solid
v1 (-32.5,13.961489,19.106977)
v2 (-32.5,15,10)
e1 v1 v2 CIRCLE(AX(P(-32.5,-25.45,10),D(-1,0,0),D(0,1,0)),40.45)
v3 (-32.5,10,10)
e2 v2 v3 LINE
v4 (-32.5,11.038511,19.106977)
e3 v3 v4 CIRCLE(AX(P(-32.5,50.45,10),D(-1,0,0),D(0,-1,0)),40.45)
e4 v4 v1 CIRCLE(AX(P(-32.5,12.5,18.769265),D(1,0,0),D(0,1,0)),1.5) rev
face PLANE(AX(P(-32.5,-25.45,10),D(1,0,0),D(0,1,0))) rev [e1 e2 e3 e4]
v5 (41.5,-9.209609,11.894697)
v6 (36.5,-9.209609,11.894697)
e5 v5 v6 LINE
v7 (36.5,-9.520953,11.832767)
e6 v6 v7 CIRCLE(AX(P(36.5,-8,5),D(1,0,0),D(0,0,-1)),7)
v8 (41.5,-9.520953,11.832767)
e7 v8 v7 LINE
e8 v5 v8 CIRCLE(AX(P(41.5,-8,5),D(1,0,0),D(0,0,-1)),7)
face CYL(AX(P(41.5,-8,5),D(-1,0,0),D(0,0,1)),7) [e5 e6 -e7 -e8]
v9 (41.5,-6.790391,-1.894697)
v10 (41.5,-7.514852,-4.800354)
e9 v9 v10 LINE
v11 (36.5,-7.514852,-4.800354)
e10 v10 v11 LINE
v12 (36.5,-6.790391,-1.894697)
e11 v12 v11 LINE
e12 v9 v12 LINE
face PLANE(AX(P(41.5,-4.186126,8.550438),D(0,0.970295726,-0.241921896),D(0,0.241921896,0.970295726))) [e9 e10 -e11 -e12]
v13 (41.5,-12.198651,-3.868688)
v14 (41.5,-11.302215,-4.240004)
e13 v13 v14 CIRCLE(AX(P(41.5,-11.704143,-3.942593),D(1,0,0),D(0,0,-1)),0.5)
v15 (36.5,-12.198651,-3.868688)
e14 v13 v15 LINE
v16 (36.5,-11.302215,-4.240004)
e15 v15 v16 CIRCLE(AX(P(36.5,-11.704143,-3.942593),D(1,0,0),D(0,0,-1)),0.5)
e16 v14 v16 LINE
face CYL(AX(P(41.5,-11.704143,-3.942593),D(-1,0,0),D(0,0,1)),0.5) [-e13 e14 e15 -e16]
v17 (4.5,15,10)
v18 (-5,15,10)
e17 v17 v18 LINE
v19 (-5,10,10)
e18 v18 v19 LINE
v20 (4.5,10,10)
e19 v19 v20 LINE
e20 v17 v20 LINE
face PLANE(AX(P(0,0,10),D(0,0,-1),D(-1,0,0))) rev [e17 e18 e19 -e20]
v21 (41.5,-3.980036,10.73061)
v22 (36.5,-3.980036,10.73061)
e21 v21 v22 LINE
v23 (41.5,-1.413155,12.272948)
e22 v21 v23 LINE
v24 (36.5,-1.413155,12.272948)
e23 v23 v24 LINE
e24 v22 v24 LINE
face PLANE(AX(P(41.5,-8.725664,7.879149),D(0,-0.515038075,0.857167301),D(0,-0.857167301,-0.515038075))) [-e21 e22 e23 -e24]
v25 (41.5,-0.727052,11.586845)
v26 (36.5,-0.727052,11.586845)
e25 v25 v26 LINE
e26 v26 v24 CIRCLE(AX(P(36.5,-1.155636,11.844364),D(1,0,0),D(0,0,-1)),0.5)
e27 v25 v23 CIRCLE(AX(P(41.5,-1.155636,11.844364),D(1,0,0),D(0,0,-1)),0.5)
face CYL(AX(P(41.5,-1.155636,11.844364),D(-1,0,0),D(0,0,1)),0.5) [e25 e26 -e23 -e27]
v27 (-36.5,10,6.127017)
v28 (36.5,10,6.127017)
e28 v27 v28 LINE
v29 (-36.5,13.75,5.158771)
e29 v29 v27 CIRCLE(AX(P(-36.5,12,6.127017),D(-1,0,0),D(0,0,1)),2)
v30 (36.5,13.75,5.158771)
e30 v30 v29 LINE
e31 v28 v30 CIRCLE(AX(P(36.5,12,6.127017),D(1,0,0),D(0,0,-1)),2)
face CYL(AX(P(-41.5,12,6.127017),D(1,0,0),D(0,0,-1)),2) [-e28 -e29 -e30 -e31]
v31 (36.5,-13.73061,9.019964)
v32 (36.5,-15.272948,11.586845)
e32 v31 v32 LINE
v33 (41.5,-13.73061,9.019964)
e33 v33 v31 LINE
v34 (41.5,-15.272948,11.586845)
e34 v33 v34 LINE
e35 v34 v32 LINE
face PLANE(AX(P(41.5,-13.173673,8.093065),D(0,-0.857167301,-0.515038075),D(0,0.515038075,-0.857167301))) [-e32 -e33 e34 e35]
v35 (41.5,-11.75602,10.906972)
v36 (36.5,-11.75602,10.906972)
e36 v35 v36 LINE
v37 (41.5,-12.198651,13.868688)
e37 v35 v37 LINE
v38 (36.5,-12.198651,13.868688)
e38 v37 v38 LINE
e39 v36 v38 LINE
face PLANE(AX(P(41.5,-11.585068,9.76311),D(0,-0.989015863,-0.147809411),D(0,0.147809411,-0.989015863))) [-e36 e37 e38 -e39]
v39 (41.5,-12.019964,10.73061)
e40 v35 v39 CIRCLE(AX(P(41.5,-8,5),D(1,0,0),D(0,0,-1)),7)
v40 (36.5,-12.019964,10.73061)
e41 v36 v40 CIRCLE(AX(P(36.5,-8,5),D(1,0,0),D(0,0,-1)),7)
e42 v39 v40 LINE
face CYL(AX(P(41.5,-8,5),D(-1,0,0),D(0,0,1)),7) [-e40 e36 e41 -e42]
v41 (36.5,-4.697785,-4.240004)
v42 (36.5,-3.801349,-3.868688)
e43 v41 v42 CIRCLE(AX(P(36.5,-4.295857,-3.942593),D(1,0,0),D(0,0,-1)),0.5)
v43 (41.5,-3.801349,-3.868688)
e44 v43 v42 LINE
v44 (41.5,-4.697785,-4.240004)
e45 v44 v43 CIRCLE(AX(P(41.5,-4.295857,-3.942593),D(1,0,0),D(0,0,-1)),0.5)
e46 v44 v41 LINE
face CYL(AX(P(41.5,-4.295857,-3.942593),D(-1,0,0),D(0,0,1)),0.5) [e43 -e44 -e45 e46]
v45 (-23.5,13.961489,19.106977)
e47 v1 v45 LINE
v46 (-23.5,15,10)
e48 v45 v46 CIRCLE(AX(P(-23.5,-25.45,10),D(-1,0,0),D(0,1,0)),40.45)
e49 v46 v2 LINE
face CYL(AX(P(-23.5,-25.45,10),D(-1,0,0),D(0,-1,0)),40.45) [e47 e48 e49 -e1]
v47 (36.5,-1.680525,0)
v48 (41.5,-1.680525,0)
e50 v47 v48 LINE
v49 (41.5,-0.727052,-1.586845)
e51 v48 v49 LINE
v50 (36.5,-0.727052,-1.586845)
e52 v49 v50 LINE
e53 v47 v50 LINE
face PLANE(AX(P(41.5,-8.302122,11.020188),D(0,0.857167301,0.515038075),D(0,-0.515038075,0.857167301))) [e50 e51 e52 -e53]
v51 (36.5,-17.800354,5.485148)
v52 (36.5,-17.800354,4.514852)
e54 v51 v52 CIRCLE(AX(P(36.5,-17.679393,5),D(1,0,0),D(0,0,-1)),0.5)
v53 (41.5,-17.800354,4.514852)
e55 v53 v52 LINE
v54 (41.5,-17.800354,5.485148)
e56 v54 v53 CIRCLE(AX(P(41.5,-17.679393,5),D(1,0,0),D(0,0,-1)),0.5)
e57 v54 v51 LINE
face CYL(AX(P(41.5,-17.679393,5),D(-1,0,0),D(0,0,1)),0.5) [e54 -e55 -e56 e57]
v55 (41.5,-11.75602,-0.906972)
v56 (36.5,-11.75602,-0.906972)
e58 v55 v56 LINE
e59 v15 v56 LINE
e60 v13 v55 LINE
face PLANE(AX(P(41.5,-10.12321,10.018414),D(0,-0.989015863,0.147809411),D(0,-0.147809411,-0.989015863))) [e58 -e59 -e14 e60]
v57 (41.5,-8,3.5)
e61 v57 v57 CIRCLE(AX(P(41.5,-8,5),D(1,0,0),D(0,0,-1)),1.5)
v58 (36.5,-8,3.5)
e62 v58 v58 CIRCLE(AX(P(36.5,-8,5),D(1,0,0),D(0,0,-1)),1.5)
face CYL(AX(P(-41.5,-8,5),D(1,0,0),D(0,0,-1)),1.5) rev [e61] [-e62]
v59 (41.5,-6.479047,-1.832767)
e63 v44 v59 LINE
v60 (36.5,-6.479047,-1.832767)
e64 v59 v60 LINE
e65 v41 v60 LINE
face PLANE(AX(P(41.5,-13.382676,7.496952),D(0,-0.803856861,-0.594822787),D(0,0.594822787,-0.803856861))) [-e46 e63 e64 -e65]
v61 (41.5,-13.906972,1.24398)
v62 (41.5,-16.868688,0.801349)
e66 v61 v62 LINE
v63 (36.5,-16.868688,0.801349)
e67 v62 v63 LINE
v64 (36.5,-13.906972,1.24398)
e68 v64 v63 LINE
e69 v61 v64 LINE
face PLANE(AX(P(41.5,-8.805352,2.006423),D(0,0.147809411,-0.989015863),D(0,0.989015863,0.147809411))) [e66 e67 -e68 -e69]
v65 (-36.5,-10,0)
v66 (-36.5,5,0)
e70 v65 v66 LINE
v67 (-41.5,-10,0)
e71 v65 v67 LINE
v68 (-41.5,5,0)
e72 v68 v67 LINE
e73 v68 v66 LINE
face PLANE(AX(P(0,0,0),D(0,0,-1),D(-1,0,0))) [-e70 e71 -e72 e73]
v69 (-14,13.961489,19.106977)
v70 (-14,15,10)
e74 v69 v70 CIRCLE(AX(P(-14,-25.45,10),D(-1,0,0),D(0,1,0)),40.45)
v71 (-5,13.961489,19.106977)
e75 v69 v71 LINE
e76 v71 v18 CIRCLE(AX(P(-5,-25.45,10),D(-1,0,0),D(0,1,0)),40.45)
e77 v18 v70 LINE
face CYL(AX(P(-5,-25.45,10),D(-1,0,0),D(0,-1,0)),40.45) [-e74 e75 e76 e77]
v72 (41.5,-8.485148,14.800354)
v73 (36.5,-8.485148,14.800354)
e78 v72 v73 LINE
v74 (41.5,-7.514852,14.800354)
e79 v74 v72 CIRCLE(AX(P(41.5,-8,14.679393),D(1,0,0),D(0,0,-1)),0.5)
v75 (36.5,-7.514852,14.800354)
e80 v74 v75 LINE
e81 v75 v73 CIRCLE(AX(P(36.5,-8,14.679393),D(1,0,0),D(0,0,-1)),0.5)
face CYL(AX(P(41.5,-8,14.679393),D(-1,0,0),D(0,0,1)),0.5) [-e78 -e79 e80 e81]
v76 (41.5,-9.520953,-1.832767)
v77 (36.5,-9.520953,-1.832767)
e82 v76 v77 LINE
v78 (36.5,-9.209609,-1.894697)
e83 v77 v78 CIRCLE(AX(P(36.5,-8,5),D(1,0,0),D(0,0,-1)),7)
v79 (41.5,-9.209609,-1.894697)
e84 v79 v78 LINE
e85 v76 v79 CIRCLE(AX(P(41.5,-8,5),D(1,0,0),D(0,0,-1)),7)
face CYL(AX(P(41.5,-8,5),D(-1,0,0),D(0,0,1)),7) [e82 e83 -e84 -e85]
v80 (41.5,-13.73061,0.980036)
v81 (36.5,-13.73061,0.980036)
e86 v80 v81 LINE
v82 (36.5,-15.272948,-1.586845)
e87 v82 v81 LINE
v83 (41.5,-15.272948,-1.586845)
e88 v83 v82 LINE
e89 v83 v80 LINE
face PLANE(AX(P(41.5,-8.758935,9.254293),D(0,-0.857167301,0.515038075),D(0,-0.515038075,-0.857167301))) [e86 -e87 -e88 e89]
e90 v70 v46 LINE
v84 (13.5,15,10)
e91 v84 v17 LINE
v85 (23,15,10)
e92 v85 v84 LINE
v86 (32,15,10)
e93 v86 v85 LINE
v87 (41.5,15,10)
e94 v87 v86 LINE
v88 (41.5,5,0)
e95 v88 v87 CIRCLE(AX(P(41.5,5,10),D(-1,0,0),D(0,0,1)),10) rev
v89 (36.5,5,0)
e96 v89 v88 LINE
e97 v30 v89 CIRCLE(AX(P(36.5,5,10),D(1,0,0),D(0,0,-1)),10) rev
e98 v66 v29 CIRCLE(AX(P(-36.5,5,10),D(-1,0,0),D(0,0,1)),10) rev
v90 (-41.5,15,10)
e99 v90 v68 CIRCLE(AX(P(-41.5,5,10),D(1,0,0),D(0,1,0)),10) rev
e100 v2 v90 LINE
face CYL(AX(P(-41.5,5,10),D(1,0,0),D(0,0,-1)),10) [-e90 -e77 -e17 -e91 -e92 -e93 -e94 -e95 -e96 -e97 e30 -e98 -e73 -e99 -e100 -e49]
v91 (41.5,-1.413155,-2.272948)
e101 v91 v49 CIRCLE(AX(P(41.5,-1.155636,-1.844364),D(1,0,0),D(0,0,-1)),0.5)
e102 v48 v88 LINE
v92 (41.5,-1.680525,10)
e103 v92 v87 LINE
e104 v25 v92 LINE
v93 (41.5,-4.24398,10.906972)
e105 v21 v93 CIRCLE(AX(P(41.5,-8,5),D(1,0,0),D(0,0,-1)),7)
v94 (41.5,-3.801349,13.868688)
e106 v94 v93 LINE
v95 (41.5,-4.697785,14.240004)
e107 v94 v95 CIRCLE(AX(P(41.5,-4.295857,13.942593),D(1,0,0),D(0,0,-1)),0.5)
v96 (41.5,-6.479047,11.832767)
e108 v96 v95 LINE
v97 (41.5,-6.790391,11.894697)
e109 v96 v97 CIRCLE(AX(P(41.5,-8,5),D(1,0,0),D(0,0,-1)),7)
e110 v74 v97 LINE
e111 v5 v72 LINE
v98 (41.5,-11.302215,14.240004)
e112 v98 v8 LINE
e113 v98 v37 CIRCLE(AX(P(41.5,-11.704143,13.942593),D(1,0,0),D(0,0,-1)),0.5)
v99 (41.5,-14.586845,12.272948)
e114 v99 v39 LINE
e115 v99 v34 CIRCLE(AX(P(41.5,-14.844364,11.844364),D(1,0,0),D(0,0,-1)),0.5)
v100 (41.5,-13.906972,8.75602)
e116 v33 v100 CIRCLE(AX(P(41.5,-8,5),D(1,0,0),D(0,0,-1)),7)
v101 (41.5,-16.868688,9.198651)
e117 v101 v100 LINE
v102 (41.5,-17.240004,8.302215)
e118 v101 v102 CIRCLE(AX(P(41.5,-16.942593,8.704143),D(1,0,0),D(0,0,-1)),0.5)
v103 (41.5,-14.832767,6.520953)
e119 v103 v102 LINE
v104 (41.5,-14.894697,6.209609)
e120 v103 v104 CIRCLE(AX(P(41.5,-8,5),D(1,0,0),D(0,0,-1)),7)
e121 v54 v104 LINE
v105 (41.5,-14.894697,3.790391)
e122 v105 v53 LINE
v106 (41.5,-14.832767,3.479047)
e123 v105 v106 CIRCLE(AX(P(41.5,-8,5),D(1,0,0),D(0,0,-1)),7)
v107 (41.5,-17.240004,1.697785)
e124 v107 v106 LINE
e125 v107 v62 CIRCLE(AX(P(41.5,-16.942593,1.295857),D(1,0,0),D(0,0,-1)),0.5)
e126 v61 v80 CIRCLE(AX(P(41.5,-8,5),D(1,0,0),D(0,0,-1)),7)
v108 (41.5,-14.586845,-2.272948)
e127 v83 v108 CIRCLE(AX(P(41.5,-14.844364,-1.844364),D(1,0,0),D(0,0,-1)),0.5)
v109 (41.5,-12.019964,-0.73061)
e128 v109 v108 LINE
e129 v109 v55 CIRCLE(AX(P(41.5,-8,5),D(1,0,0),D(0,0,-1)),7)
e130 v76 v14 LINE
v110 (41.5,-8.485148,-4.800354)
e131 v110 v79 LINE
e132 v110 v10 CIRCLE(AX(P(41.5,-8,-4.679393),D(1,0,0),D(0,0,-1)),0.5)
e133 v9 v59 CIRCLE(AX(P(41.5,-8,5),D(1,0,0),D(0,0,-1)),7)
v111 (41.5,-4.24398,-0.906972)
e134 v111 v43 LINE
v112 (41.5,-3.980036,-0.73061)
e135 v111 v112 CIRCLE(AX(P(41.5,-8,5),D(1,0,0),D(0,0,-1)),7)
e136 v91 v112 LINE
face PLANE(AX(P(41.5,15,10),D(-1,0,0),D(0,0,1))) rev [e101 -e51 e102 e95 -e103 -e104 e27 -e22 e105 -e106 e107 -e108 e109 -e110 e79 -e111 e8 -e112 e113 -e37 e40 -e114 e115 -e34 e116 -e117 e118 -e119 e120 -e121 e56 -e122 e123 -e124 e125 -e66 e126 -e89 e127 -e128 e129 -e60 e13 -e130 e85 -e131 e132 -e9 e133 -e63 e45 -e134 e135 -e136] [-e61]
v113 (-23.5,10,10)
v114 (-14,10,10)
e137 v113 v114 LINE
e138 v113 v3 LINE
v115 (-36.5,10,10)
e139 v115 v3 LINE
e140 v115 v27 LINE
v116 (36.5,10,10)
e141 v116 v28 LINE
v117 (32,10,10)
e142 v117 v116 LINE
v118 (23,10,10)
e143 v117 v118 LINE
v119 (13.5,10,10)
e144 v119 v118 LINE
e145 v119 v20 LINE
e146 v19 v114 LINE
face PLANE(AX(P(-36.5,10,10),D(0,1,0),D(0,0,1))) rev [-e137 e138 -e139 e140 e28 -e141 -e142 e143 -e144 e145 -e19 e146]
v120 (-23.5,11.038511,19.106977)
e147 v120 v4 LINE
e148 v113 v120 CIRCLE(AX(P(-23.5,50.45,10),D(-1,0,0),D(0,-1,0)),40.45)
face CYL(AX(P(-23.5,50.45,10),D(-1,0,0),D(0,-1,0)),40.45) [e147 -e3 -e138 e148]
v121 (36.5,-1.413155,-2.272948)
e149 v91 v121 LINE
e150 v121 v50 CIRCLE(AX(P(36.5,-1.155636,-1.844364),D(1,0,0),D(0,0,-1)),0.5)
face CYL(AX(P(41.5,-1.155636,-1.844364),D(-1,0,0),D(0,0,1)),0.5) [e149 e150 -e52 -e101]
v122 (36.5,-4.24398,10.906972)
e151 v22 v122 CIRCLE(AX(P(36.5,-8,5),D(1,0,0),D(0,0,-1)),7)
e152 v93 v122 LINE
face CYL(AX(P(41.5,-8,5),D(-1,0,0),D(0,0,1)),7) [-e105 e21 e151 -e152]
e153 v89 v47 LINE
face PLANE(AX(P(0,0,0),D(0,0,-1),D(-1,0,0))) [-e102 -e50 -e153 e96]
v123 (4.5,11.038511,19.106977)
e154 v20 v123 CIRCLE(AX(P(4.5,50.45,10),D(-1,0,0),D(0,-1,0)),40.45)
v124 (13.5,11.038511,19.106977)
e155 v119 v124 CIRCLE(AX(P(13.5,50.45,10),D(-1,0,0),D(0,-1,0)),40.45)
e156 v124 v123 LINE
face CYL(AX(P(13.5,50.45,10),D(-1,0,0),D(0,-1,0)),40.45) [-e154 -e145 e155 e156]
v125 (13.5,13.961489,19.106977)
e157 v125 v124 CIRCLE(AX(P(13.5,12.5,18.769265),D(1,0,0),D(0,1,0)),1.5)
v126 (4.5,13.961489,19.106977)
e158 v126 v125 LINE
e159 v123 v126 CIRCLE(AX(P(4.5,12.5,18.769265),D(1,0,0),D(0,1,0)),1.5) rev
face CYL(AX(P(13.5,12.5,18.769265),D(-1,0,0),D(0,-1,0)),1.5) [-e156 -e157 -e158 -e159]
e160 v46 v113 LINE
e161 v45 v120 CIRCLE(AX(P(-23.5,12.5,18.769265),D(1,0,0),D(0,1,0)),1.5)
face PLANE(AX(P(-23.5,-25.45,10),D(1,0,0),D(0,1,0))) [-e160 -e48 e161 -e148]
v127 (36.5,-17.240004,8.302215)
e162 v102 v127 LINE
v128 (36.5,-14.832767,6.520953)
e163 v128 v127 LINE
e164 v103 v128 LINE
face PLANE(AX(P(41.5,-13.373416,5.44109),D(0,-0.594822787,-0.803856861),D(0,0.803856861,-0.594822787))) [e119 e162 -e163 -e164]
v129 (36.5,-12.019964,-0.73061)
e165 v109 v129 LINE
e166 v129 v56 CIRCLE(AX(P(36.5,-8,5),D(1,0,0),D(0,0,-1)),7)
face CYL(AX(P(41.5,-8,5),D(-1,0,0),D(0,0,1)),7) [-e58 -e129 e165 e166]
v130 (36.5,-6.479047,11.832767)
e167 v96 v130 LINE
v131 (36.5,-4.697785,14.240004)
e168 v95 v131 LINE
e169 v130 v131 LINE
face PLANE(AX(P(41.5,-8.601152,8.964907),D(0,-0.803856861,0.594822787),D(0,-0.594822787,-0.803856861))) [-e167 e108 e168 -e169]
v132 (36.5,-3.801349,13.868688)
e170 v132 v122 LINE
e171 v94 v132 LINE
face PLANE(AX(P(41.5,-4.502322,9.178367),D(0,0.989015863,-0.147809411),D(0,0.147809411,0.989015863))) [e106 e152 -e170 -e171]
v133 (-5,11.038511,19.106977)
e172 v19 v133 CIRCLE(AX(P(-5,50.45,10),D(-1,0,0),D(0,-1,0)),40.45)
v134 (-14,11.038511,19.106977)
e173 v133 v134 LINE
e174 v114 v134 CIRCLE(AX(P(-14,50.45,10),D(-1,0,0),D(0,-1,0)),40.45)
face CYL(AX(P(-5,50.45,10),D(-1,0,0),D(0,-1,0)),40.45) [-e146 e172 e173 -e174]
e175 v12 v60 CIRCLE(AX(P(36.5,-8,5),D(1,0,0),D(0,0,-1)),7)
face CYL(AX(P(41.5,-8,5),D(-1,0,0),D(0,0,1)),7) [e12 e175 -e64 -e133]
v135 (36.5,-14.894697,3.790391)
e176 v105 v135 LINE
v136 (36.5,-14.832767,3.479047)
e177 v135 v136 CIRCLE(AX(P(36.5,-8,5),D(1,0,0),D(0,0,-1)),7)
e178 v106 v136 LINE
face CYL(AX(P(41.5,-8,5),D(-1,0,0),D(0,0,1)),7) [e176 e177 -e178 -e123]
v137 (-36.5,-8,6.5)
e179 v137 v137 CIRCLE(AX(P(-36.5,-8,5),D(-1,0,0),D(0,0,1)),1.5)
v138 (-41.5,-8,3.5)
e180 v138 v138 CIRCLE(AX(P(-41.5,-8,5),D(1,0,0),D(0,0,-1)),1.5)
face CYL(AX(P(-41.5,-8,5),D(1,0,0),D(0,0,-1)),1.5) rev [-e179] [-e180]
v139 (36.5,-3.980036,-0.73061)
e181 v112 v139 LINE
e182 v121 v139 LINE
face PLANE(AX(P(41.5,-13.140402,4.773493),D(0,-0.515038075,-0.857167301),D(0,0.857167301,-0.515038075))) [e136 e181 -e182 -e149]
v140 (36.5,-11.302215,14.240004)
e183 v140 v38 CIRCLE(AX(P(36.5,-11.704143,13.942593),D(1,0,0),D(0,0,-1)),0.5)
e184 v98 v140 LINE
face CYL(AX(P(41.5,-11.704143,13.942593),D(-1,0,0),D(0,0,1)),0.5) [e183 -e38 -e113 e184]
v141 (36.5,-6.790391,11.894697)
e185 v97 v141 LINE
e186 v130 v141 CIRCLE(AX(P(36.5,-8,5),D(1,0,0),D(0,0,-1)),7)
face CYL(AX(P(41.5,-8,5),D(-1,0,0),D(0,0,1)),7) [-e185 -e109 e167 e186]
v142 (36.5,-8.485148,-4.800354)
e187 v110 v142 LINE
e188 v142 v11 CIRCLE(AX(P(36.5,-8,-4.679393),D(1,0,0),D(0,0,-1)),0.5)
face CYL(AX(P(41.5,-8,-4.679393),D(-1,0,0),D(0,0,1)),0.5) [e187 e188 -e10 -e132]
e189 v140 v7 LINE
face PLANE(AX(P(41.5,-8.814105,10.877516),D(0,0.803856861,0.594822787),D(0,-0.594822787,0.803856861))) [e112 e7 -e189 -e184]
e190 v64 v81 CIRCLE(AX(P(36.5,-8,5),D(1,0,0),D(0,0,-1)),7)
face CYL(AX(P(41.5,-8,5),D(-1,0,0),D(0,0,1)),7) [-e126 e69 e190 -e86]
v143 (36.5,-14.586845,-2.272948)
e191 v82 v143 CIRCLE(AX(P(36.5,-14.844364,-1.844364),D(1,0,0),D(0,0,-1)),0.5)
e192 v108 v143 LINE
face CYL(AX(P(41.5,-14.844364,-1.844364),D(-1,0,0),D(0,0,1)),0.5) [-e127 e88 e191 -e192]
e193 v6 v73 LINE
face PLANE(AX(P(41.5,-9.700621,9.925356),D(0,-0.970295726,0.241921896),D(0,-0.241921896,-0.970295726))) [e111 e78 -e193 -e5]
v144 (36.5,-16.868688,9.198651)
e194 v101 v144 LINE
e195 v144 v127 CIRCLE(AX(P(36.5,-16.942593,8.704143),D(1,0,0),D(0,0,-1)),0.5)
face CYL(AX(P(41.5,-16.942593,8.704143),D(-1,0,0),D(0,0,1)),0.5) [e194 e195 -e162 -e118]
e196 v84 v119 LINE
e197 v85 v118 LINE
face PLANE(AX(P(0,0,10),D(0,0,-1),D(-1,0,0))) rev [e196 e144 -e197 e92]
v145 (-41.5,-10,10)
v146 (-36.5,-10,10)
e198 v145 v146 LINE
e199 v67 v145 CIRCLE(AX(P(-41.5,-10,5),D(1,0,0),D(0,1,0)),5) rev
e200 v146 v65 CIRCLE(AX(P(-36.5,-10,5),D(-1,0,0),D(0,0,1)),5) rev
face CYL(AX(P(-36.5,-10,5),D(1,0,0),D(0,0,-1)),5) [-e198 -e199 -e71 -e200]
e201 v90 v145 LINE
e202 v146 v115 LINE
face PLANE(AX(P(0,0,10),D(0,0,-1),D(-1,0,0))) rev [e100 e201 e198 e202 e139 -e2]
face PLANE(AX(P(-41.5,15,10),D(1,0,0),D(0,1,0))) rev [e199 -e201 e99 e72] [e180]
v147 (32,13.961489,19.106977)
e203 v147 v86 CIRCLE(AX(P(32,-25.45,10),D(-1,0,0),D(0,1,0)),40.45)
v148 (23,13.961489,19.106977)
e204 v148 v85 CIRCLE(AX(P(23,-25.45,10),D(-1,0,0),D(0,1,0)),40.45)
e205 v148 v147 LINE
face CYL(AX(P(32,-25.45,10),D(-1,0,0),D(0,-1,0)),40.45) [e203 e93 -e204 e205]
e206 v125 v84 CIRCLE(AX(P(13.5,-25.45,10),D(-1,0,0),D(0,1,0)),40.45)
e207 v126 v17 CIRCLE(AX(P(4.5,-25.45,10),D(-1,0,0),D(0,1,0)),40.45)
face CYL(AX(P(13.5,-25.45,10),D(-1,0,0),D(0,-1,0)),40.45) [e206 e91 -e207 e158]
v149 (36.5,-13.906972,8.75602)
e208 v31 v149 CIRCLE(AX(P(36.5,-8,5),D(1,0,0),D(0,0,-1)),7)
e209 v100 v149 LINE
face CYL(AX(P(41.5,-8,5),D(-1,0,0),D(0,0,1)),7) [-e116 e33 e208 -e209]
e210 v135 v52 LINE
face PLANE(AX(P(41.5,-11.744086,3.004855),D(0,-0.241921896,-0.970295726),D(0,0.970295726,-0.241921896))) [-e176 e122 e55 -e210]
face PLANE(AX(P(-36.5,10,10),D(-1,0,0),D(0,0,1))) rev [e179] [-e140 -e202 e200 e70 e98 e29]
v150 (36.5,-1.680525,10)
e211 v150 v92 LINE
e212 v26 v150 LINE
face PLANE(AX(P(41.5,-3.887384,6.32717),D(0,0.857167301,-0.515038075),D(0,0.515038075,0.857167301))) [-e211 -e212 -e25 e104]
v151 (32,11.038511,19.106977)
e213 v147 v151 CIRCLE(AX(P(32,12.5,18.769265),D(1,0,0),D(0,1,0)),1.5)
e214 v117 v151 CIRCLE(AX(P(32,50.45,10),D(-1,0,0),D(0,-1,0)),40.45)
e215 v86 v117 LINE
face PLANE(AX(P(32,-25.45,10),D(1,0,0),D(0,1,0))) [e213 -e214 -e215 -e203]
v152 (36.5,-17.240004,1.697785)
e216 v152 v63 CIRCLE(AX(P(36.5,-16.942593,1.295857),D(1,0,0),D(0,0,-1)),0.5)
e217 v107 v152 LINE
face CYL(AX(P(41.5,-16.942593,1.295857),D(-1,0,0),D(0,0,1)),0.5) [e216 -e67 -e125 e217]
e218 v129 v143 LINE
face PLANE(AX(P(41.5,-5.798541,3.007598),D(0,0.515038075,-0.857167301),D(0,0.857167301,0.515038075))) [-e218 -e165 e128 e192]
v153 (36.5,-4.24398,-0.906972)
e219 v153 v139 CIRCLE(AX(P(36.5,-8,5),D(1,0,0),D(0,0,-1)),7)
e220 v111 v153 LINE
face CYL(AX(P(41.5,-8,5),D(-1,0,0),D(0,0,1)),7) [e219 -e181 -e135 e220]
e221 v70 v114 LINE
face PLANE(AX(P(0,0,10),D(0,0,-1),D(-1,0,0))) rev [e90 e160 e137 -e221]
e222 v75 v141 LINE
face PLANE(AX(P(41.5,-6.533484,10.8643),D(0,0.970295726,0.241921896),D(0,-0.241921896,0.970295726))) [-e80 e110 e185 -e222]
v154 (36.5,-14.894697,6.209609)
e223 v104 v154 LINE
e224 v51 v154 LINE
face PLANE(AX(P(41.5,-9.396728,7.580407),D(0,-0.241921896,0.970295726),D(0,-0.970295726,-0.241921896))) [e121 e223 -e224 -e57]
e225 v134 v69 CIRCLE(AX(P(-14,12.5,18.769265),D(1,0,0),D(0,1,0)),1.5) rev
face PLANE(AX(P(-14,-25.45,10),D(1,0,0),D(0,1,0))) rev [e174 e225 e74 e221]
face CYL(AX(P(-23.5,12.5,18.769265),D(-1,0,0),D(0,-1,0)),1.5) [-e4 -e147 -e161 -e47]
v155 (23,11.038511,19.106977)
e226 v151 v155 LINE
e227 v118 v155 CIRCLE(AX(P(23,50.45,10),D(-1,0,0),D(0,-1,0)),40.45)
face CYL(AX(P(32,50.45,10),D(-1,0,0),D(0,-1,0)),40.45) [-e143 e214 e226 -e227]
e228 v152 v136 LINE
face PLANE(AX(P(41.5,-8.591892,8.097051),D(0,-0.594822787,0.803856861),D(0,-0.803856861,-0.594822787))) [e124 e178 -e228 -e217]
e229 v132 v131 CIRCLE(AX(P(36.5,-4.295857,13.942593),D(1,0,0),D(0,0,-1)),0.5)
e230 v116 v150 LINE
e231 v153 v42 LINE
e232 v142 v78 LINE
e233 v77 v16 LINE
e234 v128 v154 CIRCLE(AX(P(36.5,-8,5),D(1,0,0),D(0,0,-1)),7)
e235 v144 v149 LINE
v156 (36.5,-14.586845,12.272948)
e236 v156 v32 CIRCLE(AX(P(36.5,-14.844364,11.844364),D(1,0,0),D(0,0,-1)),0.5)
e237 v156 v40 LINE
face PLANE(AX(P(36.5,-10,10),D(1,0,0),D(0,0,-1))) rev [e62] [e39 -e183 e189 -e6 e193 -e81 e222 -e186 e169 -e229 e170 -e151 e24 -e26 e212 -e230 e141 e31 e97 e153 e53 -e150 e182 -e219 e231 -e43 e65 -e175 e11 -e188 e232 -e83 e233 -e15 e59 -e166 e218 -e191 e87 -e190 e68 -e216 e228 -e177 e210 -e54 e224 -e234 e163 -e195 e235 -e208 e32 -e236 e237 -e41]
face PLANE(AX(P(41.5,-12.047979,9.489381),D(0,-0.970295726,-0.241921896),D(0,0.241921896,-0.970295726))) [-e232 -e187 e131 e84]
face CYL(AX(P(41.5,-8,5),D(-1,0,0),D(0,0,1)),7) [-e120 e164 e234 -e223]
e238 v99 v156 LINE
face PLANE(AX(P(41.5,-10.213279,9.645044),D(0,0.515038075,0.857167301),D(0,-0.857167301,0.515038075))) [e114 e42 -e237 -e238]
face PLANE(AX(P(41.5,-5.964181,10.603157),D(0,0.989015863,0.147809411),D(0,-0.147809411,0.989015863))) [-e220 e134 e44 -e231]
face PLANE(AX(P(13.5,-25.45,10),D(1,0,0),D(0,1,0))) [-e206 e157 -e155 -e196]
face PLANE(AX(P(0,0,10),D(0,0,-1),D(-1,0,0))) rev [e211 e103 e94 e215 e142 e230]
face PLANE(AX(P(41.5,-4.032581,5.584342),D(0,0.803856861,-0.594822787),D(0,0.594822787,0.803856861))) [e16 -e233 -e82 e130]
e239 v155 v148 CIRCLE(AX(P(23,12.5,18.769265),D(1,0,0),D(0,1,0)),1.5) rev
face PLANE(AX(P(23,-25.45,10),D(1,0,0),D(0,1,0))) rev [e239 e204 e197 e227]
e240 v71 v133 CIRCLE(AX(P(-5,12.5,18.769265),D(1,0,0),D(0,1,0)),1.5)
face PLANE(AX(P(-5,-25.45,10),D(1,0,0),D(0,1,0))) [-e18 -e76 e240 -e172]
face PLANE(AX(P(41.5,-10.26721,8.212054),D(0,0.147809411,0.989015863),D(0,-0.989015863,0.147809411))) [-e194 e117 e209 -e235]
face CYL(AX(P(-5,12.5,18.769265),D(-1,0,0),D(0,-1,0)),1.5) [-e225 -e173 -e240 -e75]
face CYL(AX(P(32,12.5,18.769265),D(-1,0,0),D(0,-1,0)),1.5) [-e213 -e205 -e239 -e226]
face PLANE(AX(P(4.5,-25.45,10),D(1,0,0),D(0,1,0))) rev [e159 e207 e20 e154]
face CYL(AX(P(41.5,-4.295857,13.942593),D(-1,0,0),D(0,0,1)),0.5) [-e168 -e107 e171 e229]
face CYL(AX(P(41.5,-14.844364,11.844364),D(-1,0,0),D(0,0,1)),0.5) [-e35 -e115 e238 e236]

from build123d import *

# Parameters (mm, degrees)
BOSS_EXTRU_1_DEPTH               = 10
BOSS_EXTRU_2_START               = -9
BOSS_EXTRU_2_DEPTH               = 9
CONG_1_R                         = 1.5
R_P_TITION_LIN_AIRE1_COUNT       = 4
R_P_TITION_LIN_AIRE1_PITCH       = 18.5
CONG_1_OF_R_P_TITION_LIN_AIRE1_R = 1.5
ENL_V_MAT_EXTRU_1_DEPTH          = 82.974649073
ENL_V_MAT_EXTRU_1_DEPTH_BACK     = 82.974649073
ESQUISSE4_R                      = 1.5
CONG_2_RADIUS                    = 5
CONG_2_LENGTH                    = 5
CONG_3_RADIUS                    = 5
CONG_3_LENGTH                    = 5
CONG_4_R                         = 10
BOSS_EXTRU_3_START               = 73
ESQUISSE5_R                      = 1.5
BOSS_EXTRU_3_DEPTH               = 5
CONG_7_R                         = 2


with BuildPart() as part:
    # Esquisse1 → Boss.-Extru.1 (new body)
    with BuildSketch(Plane.XY):
        Polygon((-36.5, 10), (36.5, 10), (36.5, -10), (36.5, -15), (41.5, -15), (41.5, 15), (-41.5, 15), (-41.5, -15), (-36.5, -15), (-36.5, -10), align=None)
    extrude(amount=BOSS_EXTRU_1_DEPTH)

    # Esquisse2 → Boss.-Extru.2 (add)
    with BuildSketch(Plane.ZY.offset(41.5).offset(BOSS_EXTRU_2_START)):
        with BuildLine():
            Line((10, 10), (10, 15))
            ThreePointArc((10, 15), (17.110731327, 14.370095429), (24, 12.5))
            ThreePointArc((24, 12.5), (17.110731327, 10.629904571), (10, 10))
        make_face()
    boss_extru_2 = extrude(amount=-BOSS_EXTRU_2_DEPTH)

    # Congé1
    cong_1_edges = [part.edges().sort_by_distance(p)[0] for p in [
        (-28, 12.5, 24),
    ]]
    fillet(cong_1_edges, radius=CONG_1_R)

    # Répétition linéaire1: Boss.-Extru.2 ×4
    with Locations(*[(i * R_P_TITION_LIN_AIRE1_PITCH, 0, 0) for i in range(1, R_P_TITION_LIN_AIRE1_COUNT)]):
        add(boss_extru_2)

    # Congé1 of Répétition linéaire1
    cong_1_of_r_p_tition_lin_aire1_edges = [part.edges().sort_by_distance(p)[0] for p in [
        (-9.5, 12.5, 24),
        (9, 12.5, 24),
        (27.5, 12.5, 24),
    ]]
    fillet(cong_1_of_r_p_tition_lin_aire1_edges, radius=CONG_1_OF_R_P_TITION_LIN_AIRE1_R)

    # Esquisse4 → Enlèv. mat.-Extru.1 (cut, two sides: drawn at the far end of the back side and taken through both)
    with BuildSketch(Plane(origin=(-36.5, 0, 0), x_dir=(0, 0, -1), z_dir=(1, 0, 0)).offset(-ENL_V_MAT_EXTRU_1_DEPTH_BACK)):
        with Locations((-5, -8)):
            Circle(ESQUISSE4_R)
    extrude(amount=ENL_V_MAT_EXTRU_1_DEPTH + ENL_V_MAT_EXTRU_1_DEPTH_BACK, mode=Mode.SUBTRACT)

    # Congé2: full round fillet: the end face becomes a half cylinder, R = half its width
    cong_2_face = Plane((-39, -15, 5), x_dir=(1, 0, 0), z_dir=(0, -1, 0))  # on the end face: x along it, z out of the body
    cong_2_slab = cong_2_face.offset(-CONG_2_RADIUS / 2) * Box(CONG_2_LENGTH, 2 * CONG_2_RADIUS, CONG_2_RADIUS, mode=Mode.PRIVATE)  # the body's end, R deep
    cong_2_round = Plane((-39, -10, 5), x_dir=(0, -1, 0), z_dir=(1, 0, 0)) * Cylinder(CONG_2_RADIUS, CONG_2_LENGTH, mode=Mode.PRIVATE)  # its axis R under the face
    add(cong_2_slab - cong_2_round, mode=Mode.SUBTRACT)

    # Congé3: full round fillet: the end face becomes a half cylinder, R = half its width
    cong_3_face = Plane((39, -15, 5), x_dir=(1, 0, 0), z_dir=(0, -1, 0))  # on the end face: x along it, z out of the body
    cong_3_slab = cong_3_face.offset(-CONG_3_RADIUS / 2) * Box(CONG_3_LENGTH, 2 * CONG_3_RADIUS, CONG_3_RADIUS, mode=Mode.PRIVATE)  # the body's end, R deep
    cong_3_round = Plane((39, -10, 5), x_dir=(0, -1, 0), z_dir=(1, 0, 0)) * Cylinder(CONG_3_RADIUS, CONG_3_LENGTH, mode=Mode.PRIVATE)  # its axis R under the face
    add(cong_3_slab - cong_3_round, mode=Mode.SUBTRACT)

    # Congé4
    # the kernel refuses this fillet: 10 mm, written as the material it takes off along each edge
    with BuildSketch(Plane(origin=(66.5, 15, 0), x_dir=(0, -1, 0), z_dir=(-1, 0, 0))) as cong_4_piece_1:
        with BuildLine():
            CenterArc((CONG_4_R, CONG_4_R), CONG_4_R, 180, 90)
            Line((0, CONG_4_R), (0, 0))
            Line((0, 0), (CONG_4_R, 0))
        make_face()
    extrude(amount=133, mode=Mode.SUBTRACT)

    # Esquisse5 → Boss.-Extru.3 (add)
    with BuildSketch(Plane(origin=(-36.5, 0, 0), x_dir=(0, 0, -1), z_dir=(1, 0, 0)).offset(BOSS_EXTRU_3_START)):
        with BuildLine():
            Line((-14.800353701, -8.485147863), (-11.894696869, -9.209609478))
            ThreePointArc((-11.894696869, -9.209609478), (-11.865496963, -9.365632254), (-11.832766827, -9.520952824))
            Line((-11.832766827, -9.520952824), (-14.240004245, -11.302214812))
            ThreePointArc((-14.240004245, -11.302214812), (-14.404532618, -11.895484958), (-13.868688146, -12.198651174))
            Line((-13.868688146, -12.198651174), (-10.906971813, -11.756019702))
            ThreePointArc((-10.906971813, -11.756019702), (-10.820287286, -11.888991631), (-10.730609975, -12.019963846))
            Line((-10.730609975, -12.019963846), (-12.272947904, -14.586845216))
            ThreePointArc((-12.272947904, -14.586845216), (-12.197917644, -15.197917644), (-11.586845216, -15.272947904))
            Line((-11.586845216, -15.272947904), (-9.019963846, -13.730609975))
            ThreePointArc((-9.019963846, -13.730609975), (-8.888991631, -13.820287286), (-8.756019702, -13.906971813))
            Line((-8.756019702, -13.906971813), (-9.198651174, -16.868688146))
            ThreePointArc((-9.198651174, -16.868688146), (-8.895484958, -17.404532618), (-8.302214812, -17.240004245))
            Line((-8.302214812, -17.240004245), (-6.520952824, -14.832766827))
            ThreePointArc((-6.520952824, -14.832766827), (-6.365632254, -14.865496963), (-6.209609478, -14.894696869))
            Line((-6.209609478, -14.894696869), (-5.485147863, -17.800353701))
            ThreePointArc((-5.485147863, -17.800353701), (-5, -18.179392753), (-4.514852137, -17.800353701))
            Line((-4.514852137, -17.800353701), (-3.790390522, -14.894696869))
            ThreePointArc((-3.790390522, -14.894696869), (-3.634367746, -14.865496963), (-3.479047176, -14.832766827))
            Line((-3.479047176, -14.832766827), (-1.697785188, -17.240004245))
            ThreePointArc((-1.697785188, -17.240004245), (-1.104515042, -17.404532618), (-0.801348826, -16.868688146))
            Line((-0.801348826, -16.868688146), (-1.243980298, -13.906971813))
            ThreePointArc((-1.243980298, -13.906971813), (-1.111008369, -13.820287286), (-0.980036154, -13.730609975))
            Line((-0.980036154, -13.730609975), (1.586845216, -15.272947904))
            ThreePointArc((1.586845216, -15.272947904), (2.197917644, -15.197917644), (2.272947904, -14.586845216))
            Line((2.272947904, -14.586845216), (0.730609975, -12.019963846))
            ThreePointArc((0.730609975, -12.019963846), (0.820287286, -11.888991631), (0.906971813, -11.756019702))
            Line((0.906971813, -11.756019702), (3.868688146, -12.198651174))
            ThreePointArc((3.868688146, -12.198651174), (4.404532618, -11.895484958), (4.240004245, -11.302214812))
            Line((4.240004245, -11.302214812), (1.832766827, -9.520952824))
            ThreePointArc((1.832766827, -9.520952824), (1.865496963, -9.365632254), (1.894696869, -9.209609478))
            Line((1.894696869, -9.209609478), (4.800353701, -8.485147863))
            ThreePointArc((4.800353701, -8.485147863), (5.179392753, -8), (4.800353701, -7.514852137))
            Line((4.800353701, -7.514852137), (1.894696869, -6.790390522))
            ThreePointArc((1.894696869, -6.790390522), (1.865496963, -6.634367746), (1.832766827, -6.479047176))
            Line((1.832766827, -6.479047176), (4.240004245, -4.697785188))
            ThreePointArc((4.240004245, -4.697785188), (4.404532618, -4.104515042), (3.868688146, -3.801348826))
            Line((3.868688146, -3.801348826), (0.906971813, -4.243980298))
            ThreePointArc((0.906971813, -4.243980298), (0.820287286, -4.111008369), (0.730609975, -3.980036154))
            Line((0.730609975, -3.980036154), (2.272947904, -1.413154784))
            ThreePointArc((2.272947904, -1.413154784), (2.197917644, -0.802082356), (1.586845216, -0.727052096))
            Line((1.586845216, -0.727052096), (-0.980036154, -2.269390025))
            ThreePointArc((-0.980036154, -2.269390025), (-1.111008369, -2.179712714), (-1.243980298, -2.093028187))
            Line((-1.243980298, -2.093028187), (-0.801348826, 0.868688146))
            ThreePointArc((-0.801348826, 0.868688146), (-1.104515042, 1.404532618), (-1.697785188, 1.240004245))
            Line((-1.697785188, 1.240004245), (-3.479047176, -1.167233173))
            ThreePointArc((-3.479047176, -1.167233173), (-3.634367746, -1.134503037), (-3.790390522, -1.105303131))
            Line((-3.790390522, -1.105303131), (-4.514852137, 1.800353701))
            ThreePointArc((-4.514852137, 1.800353701), (-5, 2.179392753), (-5.485147863, 1.800353701))
            Line((-5.485147863, 1.800353701), (-6.209609478, -1.105303131))
            ThreePointArc((-6.209609478, -1.105303131), (-6.365632254, -1.134503037), (-6.520952824, -1.167233173))
            Line((-6.520952824, -1.167233173), (-8.302214812, 1.240004245))
            ThreePointArc((-8.302214812, 1.240004245), (-8.895484958, 1.404532618), (-9.198651174, 0.868688146))
            Line((-9.198651174, 0.868688146), (-8.756019702, -2.093028187))
            ThreePointArc((-8.756019702, -2.093028187), (-8.888991631, -2.179712714), (-9.019963846, -2.269390025))
            Line((-9.019963846, -2.269390025), (-11.586845216, -0.727052096))
            ThreePointArc((-11.586845216, -0.727052096), (-12.197917644, -0.802082356), (-12.272947904, -1.413154784))
            Line((-12.272947904, -1.413154784), (-10.730609975, -3.980036154))
            ThreePointArc((-10.730609975, -3.980036154), (-10.820287286, -4.111008369), (-10.906971813, -4.243980298))
            Line((-10.906971813, -4.243980298), (-13.868688146, -3.801348826))
            ThreePointArc((-13.868688146, -3.801348826), (-14.404532618, -4.104515042), (-14.240004245, -4.697785188))
            Line((-14.240004245, -4.697785188), (-11.832766827, -6.479047176))
            ThreePointArc((-11.832766827, -6.479047176), (-11.865496963, -6.634367746), (-11.894696869, -6.790390522))
            Line((-11.894696869, -6.790390522), (-14.800353701, -7.514852137))
            ThreePointArc((-14.800353701, -7.514852137), (-15.179392753, -8), (-14.800353701, -8.485147863))
        make_face()
        with Locations((-5, -8)):
            Circle(ESQUISSE5_R, mode=Mode.SUBTRACT)
    extrude(amount=BOSS_EXTRU_3_DEPTH)

    # Congé7
    cong_7_edges = [part.edges().sort_by_distance(p)[0] for p in [
        (0, 10, 1.339745962),
    ]]
    fillet(cong_7_edges, radius=CONG_7_R)


solid = part.part
